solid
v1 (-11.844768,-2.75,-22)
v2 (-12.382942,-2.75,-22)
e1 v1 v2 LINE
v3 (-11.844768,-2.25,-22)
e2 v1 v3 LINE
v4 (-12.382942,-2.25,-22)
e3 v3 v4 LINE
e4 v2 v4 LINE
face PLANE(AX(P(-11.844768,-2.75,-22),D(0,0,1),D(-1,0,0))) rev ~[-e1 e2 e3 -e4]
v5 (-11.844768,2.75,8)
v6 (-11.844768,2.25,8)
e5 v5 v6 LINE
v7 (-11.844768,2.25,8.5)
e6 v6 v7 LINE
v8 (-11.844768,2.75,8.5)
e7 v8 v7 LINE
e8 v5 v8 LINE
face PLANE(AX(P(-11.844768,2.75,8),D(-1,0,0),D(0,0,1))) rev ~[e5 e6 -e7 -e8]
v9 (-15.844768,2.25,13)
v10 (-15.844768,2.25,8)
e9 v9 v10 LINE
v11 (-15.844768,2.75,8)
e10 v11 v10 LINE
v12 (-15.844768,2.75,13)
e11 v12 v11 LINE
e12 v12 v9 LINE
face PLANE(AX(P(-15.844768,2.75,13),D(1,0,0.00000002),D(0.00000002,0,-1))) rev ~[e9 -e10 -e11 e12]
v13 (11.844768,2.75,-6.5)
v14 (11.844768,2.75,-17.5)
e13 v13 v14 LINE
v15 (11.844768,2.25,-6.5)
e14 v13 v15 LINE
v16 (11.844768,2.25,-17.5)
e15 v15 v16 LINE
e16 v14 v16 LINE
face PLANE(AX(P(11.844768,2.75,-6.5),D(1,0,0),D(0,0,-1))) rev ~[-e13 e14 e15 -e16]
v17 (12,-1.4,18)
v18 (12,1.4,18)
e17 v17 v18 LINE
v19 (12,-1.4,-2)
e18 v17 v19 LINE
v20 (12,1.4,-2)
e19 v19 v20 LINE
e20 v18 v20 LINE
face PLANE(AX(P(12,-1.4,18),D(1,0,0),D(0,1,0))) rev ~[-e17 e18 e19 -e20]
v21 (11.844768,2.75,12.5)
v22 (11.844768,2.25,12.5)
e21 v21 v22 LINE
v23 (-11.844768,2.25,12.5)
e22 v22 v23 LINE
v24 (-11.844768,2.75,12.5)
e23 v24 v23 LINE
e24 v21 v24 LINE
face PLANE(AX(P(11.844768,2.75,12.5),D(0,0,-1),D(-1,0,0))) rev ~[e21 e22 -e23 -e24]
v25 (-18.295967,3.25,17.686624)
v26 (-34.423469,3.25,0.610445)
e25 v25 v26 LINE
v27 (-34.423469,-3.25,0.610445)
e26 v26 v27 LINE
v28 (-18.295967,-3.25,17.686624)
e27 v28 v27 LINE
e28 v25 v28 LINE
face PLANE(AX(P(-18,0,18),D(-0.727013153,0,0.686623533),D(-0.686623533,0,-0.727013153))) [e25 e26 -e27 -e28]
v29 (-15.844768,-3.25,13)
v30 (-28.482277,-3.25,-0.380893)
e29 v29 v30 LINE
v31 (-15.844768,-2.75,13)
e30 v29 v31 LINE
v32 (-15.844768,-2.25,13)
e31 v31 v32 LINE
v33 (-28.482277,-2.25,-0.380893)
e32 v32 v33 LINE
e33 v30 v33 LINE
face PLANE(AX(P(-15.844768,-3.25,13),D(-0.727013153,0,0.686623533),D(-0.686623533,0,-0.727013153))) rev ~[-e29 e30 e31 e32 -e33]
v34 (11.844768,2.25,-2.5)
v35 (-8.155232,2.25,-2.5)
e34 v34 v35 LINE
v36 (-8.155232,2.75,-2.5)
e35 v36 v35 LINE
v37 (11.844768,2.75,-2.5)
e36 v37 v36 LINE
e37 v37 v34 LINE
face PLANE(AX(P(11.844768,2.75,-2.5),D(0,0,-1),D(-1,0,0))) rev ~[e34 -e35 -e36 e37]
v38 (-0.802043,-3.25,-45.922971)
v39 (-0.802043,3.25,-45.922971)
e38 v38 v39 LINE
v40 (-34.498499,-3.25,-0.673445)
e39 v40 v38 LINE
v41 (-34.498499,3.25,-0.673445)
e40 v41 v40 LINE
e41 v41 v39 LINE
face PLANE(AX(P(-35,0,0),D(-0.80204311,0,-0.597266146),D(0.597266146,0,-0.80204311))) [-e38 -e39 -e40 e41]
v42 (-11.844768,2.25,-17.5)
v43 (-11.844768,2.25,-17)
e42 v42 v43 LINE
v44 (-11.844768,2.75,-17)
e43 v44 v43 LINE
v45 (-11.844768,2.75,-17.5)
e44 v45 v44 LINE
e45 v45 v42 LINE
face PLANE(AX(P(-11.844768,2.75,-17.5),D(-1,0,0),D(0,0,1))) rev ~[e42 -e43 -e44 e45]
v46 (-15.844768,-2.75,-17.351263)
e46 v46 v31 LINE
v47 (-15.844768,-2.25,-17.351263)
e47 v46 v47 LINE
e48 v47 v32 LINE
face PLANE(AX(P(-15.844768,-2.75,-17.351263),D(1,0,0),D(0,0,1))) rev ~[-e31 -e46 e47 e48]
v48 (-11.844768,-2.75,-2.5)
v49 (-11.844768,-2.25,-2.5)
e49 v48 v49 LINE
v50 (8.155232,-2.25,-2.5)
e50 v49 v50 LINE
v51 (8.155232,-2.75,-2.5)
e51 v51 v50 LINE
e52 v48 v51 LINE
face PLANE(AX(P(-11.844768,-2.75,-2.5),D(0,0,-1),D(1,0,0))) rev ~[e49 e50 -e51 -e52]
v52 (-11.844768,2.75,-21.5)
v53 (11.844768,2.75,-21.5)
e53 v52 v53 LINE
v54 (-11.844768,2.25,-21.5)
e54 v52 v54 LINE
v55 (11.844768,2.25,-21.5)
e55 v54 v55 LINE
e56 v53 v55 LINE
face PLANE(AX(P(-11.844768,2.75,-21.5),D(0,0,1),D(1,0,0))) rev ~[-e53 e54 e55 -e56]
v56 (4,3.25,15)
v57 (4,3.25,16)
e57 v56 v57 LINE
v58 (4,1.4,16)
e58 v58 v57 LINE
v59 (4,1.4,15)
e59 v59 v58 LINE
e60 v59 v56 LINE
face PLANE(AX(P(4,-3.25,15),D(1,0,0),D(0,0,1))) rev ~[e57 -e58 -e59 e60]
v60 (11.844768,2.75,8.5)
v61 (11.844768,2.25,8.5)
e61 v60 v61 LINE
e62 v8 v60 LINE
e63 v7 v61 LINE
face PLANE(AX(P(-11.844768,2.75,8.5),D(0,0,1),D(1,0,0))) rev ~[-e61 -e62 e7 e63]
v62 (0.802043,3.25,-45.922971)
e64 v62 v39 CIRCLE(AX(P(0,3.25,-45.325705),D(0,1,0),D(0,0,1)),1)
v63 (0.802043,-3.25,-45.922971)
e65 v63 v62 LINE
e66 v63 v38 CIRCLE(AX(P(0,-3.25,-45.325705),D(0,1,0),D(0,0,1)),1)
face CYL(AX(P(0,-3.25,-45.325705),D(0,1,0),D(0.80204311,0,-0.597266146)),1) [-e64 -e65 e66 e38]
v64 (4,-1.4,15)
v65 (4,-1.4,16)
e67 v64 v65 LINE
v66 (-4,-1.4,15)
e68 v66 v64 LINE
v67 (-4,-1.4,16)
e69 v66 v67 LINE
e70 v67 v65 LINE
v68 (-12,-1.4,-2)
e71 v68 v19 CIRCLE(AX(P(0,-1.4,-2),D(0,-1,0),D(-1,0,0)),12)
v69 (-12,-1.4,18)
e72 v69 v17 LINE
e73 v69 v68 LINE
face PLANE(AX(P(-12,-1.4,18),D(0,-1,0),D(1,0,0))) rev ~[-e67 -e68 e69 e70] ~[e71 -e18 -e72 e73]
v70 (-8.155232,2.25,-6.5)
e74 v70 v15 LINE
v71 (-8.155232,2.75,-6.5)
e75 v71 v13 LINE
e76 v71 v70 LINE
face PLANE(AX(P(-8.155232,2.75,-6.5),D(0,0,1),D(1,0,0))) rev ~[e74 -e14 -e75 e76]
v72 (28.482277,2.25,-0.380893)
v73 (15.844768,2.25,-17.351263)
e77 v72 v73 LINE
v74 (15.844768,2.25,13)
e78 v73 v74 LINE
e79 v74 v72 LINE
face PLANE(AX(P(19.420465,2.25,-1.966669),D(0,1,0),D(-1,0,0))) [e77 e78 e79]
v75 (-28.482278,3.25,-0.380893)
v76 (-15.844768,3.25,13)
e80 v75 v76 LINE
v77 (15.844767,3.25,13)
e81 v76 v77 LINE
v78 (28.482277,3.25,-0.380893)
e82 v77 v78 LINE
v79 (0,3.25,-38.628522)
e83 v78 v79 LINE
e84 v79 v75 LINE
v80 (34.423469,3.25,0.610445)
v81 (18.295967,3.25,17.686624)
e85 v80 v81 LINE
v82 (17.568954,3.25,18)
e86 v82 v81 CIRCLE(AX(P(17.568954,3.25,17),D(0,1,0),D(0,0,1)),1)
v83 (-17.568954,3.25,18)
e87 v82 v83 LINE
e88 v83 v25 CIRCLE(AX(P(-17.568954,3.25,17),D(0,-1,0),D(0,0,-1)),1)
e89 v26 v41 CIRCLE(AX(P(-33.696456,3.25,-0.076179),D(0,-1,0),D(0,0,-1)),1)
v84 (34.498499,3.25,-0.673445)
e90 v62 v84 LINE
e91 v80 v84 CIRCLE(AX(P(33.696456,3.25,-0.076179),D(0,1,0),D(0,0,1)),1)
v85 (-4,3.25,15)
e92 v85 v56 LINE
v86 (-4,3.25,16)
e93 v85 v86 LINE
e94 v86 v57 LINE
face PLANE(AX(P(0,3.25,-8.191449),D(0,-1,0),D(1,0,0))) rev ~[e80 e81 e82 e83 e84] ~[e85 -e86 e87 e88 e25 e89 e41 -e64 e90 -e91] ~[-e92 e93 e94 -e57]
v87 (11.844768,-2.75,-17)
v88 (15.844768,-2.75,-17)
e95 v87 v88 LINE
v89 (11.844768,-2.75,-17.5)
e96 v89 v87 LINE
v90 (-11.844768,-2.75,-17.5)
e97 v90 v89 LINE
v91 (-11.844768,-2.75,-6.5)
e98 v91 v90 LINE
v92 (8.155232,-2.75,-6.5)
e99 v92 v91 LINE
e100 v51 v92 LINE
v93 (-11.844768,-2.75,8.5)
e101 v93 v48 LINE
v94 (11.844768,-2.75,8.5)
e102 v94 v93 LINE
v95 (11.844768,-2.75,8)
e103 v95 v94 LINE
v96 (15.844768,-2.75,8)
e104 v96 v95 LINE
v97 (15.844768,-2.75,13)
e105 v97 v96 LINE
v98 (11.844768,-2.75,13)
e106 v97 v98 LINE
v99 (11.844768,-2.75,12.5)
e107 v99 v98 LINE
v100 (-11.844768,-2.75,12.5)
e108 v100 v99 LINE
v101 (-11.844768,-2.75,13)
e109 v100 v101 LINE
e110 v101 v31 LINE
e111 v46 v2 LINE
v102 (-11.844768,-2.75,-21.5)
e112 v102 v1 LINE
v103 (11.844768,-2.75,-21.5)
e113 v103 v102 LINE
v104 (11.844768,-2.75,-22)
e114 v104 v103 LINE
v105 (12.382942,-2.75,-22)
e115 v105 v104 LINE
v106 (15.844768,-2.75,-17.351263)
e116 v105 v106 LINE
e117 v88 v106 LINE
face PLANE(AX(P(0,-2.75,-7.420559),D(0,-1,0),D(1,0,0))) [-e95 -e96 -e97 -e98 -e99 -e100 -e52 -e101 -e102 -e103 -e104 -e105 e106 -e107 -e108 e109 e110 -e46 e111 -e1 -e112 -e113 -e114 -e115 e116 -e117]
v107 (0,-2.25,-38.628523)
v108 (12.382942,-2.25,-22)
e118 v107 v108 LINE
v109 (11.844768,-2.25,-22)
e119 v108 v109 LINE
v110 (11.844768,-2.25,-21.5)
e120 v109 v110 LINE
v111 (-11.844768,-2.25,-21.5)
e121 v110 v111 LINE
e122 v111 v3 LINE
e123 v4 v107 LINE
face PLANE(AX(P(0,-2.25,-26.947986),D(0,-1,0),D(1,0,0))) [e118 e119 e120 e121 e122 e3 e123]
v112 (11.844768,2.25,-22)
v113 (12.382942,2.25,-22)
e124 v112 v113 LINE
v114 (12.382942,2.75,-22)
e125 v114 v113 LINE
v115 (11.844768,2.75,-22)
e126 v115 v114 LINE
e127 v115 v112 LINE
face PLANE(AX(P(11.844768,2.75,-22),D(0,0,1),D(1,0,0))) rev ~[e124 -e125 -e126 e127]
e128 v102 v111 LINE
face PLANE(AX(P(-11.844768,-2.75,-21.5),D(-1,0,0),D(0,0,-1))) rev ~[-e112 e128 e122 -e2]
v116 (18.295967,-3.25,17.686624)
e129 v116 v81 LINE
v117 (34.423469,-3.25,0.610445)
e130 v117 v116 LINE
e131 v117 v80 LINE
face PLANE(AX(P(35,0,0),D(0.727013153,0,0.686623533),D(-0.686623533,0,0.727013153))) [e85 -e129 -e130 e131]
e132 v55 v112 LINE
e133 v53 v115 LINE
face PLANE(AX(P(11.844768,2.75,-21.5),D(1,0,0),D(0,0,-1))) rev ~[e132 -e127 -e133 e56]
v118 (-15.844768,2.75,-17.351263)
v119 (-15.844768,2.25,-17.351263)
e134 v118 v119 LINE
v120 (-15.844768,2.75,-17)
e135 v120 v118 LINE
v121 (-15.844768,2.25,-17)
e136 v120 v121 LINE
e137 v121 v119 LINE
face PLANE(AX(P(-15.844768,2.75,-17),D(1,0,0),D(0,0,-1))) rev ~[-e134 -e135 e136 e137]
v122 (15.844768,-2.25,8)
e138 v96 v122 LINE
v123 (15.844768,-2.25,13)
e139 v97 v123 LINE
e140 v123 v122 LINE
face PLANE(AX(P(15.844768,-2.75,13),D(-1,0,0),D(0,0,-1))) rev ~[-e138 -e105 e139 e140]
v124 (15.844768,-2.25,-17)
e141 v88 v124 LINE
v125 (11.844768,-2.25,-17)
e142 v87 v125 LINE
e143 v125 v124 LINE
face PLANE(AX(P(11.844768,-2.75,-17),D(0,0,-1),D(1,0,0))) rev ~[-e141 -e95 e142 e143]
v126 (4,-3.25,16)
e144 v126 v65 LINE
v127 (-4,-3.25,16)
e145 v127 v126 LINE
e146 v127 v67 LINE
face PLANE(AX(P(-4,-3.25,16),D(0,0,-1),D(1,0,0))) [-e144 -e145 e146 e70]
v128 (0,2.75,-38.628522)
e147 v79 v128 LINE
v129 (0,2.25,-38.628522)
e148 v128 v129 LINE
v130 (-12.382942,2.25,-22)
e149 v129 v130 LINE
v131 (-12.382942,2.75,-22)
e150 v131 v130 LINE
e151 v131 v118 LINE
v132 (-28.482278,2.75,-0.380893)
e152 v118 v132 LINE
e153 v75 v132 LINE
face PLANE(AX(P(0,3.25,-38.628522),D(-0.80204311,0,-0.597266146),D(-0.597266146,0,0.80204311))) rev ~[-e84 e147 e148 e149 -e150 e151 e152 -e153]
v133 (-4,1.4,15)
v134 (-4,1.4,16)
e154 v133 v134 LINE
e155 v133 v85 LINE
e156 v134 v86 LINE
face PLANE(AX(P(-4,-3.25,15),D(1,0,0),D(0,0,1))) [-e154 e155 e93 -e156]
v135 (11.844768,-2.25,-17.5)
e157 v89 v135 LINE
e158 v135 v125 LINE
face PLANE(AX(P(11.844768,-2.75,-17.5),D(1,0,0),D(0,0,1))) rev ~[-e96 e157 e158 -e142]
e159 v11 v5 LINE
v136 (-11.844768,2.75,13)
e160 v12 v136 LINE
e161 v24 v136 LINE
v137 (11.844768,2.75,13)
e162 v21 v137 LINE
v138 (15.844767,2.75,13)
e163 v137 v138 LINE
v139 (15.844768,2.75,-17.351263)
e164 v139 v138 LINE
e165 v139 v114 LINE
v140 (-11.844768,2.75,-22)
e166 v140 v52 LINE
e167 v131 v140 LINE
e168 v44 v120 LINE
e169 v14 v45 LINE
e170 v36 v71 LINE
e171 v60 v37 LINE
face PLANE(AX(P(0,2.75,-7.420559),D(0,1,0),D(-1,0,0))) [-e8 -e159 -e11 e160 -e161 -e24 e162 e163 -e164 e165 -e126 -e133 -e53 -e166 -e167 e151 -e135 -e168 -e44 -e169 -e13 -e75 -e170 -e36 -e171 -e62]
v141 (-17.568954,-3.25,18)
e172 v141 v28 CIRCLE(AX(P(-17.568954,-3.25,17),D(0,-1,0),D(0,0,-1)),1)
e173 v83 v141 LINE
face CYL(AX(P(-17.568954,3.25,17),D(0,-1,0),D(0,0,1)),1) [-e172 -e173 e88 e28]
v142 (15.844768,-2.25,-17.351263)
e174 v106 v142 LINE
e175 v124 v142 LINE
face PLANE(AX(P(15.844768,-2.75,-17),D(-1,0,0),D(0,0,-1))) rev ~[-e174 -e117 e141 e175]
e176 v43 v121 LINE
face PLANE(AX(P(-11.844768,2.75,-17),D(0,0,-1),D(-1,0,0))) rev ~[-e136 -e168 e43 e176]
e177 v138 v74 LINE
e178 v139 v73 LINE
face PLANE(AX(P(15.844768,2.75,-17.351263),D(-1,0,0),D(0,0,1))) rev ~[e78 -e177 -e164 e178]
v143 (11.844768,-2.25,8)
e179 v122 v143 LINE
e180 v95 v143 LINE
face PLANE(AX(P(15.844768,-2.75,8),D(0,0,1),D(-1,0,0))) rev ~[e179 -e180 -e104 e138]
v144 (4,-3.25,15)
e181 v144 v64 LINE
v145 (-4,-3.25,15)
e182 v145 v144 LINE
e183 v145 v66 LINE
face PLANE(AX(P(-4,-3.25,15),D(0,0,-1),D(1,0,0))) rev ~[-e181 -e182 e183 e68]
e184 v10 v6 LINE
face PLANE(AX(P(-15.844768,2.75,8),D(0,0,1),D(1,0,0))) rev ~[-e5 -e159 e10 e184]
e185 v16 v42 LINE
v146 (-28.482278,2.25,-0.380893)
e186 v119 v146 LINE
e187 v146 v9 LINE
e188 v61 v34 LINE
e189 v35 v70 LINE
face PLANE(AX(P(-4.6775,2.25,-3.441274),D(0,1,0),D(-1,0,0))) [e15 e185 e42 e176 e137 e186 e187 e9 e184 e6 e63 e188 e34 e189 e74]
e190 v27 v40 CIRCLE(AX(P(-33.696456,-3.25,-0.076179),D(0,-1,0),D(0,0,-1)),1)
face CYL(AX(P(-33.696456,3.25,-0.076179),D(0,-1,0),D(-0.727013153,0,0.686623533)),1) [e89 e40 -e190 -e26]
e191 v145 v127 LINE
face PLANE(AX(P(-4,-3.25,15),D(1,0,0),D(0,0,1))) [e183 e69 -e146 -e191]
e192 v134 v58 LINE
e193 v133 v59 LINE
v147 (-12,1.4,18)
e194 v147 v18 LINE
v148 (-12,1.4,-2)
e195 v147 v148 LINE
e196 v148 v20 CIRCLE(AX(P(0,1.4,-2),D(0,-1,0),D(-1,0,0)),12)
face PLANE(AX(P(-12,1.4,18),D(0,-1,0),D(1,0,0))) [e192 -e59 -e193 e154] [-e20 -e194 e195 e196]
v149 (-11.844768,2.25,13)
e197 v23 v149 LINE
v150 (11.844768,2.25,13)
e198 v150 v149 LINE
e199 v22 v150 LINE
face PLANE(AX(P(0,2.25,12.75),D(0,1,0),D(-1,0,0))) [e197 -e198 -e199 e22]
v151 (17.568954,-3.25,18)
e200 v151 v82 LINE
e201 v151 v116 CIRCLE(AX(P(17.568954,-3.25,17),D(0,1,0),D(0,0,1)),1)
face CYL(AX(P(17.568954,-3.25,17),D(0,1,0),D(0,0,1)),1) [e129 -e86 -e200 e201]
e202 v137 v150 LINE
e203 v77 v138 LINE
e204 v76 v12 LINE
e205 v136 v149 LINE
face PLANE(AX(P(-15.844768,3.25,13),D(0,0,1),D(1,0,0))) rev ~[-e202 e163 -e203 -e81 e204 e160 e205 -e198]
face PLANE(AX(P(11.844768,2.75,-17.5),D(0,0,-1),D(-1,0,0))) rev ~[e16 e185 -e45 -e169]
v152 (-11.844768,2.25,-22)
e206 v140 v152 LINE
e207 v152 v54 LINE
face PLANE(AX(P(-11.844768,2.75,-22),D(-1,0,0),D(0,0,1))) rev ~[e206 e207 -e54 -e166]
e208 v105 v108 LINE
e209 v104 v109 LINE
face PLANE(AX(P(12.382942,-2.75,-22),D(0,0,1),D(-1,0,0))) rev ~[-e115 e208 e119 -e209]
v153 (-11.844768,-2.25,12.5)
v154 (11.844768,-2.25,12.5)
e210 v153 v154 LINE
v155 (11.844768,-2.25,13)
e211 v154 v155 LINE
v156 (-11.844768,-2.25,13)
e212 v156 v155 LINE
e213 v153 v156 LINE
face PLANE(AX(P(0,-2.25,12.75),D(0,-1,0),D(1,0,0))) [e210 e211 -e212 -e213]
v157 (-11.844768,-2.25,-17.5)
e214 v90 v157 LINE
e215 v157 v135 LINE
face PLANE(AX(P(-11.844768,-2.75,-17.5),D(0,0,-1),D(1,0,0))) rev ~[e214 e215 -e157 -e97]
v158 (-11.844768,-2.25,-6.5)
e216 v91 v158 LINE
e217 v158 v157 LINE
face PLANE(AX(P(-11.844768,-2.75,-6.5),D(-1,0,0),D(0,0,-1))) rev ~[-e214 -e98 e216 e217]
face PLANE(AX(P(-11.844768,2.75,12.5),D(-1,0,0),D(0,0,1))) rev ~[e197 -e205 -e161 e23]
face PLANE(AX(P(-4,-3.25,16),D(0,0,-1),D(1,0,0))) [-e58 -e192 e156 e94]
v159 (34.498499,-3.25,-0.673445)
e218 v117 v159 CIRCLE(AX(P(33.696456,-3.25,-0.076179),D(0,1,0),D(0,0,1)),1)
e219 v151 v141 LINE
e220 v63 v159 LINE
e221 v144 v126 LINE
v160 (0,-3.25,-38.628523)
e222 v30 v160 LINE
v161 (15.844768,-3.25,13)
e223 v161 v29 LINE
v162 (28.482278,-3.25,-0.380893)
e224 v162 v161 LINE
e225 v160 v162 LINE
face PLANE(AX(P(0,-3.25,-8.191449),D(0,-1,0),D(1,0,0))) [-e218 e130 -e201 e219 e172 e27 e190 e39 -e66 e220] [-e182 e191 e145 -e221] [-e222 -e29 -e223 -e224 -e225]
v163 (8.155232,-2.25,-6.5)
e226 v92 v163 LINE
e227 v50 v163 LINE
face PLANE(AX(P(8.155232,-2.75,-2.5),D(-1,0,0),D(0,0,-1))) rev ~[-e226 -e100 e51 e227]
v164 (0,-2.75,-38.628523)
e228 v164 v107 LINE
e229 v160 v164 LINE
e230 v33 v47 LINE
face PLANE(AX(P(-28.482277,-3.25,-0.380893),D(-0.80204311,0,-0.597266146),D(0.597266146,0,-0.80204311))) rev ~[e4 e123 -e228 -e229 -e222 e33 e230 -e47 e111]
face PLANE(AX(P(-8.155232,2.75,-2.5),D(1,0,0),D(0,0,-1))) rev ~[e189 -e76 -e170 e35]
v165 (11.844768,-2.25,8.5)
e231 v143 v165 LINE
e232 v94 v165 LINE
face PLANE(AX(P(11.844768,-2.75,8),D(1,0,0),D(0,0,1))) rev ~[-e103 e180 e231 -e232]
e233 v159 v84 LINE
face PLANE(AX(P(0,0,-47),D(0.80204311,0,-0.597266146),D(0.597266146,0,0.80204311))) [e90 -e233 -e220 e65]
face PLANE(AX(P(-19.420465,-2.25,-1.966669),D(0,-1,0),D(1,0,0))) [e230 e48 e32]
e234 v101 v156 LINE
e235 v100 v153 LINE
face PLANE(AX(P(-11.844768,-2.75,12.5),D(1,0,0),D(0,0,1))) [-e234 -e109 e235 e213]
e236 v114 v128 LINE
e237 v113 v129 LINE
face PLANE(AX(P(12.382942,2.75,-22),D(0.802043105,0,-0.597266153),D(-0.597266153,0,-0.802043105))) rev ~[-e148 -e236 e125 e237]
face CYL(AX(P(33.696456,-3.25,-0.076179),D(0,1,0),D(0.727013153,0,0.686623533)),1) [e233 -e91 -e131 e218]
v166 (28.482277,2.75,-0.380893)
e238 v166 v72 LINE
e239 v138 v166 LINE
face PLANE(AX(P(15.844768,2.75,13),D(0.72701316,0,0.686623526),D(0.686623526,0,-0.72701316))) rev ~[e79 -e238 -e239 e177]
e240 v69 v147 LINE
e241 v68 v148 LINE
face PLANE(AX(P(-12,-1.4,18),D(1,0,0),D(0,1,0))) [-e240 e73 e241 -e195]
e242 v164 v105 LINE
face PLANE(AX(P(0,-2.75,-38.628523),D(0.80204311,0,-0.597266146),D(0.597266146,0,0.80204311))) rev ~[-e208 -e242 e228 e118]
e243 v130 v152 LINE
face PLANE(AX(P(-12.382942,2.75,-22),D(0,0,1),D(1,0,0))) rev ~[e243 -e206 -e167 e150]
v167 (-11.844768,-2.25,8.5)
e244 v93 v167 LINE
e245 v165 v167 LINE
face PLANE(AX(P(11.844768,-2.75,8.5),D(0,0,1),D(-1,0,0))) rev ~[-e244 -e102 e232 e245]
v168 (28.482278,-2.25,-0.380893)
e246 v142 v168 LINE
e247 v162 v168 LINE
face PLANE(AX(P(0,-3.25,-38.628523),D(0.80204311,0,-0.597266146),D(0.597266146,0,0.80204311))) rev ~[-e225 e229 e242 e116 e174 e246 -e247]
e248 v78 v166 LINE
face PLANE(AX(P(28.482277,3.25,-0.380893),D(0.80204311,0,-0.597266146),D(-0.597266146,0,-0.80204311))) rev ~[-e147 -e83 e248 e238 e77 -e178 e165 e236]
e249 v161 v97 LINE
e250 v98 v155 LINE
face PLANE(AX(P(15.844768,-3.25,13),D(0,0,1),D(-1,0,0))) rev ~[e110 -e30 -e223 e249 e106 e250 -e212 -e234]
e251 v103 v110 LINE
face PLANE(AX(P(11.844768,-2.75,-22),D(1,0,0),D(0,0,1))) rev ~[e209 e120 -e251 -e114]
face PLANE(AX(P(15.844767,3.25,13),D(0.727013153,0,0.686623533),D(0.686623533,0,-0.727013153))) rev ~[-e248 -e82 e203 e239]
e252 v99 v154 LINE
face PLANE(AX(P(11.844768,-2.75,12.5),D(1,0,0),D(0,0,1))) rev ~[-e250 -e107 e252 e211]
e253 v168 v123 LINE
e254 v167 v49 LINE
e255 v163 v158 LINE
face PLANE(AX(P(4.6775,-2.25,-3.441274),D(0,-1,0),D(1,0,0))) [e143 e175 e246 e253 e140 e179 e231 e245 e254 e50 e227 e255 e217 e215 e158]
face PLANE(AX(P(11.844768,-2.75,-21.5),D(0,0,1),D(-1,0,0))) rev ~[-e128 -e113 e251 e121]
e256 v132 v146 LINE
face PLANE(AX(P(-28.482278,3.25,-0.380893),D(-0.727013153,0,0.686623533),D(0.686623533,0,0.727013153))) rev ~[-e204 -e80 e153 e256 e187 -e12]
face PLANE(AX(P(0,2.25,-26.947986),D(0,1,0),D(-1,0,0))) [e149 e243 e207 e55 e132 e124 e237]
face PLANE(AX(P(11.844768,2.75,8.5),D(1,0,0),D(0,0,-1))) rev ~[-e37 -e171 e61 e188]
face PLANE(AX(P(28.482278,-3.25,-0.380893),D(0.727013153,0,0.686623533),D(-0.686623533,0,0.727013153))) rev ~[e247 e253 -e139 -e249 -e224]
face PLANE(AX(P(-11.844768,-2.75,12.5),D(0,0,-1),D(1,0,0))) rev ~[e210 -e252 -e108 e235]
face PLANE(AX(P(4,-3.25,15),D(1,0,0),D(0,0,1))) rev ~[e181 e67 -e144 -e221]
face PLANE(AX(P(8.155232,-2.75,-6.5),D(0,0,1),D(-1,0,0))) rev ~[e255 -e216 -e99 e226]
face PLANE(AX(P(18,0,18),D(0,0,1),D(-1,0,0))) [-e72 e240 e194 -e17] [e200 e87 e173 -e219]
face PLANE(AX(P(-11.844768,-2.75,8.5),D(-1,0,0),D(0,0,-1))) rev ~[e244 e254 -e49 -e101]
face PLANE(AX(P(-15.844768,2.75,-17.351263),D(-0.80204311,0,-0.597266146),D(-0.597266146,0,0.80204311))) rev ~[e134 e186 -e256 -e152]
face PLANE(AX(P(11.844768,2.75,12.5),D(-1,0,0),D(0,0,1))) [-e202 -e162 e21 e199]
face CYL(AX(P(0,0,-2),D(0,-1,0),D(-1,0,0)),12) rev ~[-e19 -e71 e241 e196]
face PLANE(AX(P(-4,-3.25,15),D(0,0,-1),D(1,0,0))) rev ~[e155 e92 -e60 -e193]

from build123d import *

# Parameters (mm, degrees)
F1_DEPTH  = 3.25
F3_DEPTH  = 0.5
F5_DEPTH  = 0.5
F6_W      = 23.6895351076
F6_H      = 0.5
F7_DEPTH  = 0.5
F8_W      = 23.6895351076
F8_H      = 0.5000002682
F9_DEPTH  = 0.5
F10_W     = 24
F10_H     = 2.8
F11_DEPTH = 20
F13_DEPTH = 1.4
F14_W     = 8
F14_H     = 1
F15_DEPTH = 25
F16_R     = 1


# Not quite as in the source:
# - ends of sketch curves that miss each other by under 0.0002 mm in the source are joined


with BuildPart() as f1:
    # F0 (on Front) → F1 (new body, symmetric)
    with BuildSketch(Plane.XZ):
        Polygon((18, 18), (0, 18), (-18, 18), (-35, 0), (0, -47), (35, 0), align=None)
    extrude(amount=F1_DEPTH, both=True)

    # F2 (on face) → F3 (cut)
    with BuildSketch(Plane.XZ.offset(3.25)):
        Polygon((15.8447675538, 13), (-15.8447675538, 13), (-28.4822773709, -0.3808927475), (1.162e-07, -38.628522516), (28.4822775009, -0.3808928851), align=None)
    extrude(amount=-F3_DEPTH, mode=Mode.SUBTRACT)

    # F4 (on face) → F5 (cut)
    with BuildSketch(Plane(origin=(0, 3.25, 0), x_dir=(-1, 0, 0), z_dir=(0, 1, 0))):
        Polygon((28.482277527, -0.3808925379), (15.8447676545, 13.0000002682), (-15.8447670441, 13.0000002682), (-28.4822772579, -0.3808928993), (0, -38.6285223599), align=None)
    extrude(amount=-F5_DEPTH, mode=Mode.SUBTRACT)

    # F6 (on face) → F7 (cut)
    with BuildSketch(Plane.XZ.offset(2.75)):
        Polygon((-15.8447675538, -17.3512630734), (-15.8447675538, 13), (-28.4822773709, -0.3808927475), align=None)
        Polygon((28.4822775009, -0.3808928851), (15.8447675538, 13), (15.8447675538, 8), (11.8447675538, 8), (11.8447675538, 8.5), (-11.8447675538, 8.5), (-11.8447675538, -2.5), (8.1552324462, -2.5), (8.1552324462, -6.5), (-11.8447675538, -6.5), (-11.8447675538, -17.5), (11.8447675538, -17.5), (11.8447675538, -17), (15.8447675538, -17), (15.8447675538, -17.3512633855), align=None)
        with Locations((0, 12.75)):
            Rectangle(F6_W, F6_H)
        Polygon((-11.8447675538, -22), (-12.3829421829, -22), (1.162e-07, -38.628522516), (12.3829424153, -22), (11.8447675538, -22), (11.8447675538, -21.5), (-11.8447675538, -21.5), align=None)
    extrude(amount=-F7_DEPTH, mode=Mode.SUBTRACT)

    # F8 (on face) → F9 (cut)
    with BuildSketch(Plane(origin=(0, 2.75, 0), x_dir=(-1, 0, 0), z_dir=(0, 1, 0))):
        Polygon((-11.8447675538, -2.5), (8.1552324462, -2.5), (8.1552324462, -6.5), (-11.8447675538, -6.5), (-11.8447675538, -17.5), (11.8447675538, -17.5), (11.8447675538, -17), (15.8447675538, -17), (15.8447675538, -17.3512630734), (28.482277527, -0.3808925379), (15.8447676545, 13.0000002682), (15.8447675538, 8), (11.8447675538, 8), (11.8447675538, 8.5), (-11.8447675538, 8.5), align=None)
        Polygon((11.8447675538, -21.5), (-11.8447675538, -21.5), (-11.8447675538, -22), (-12.3829424153, -22), (0, -38.6285223599), (12.3829421829, -22), (11.8447675538, -22), align=None)
        Polygon((-15.8447675538, -17.3512630734), (-15.8447675538, 13), (-28.4822772579, -0.3808928993), align=None)
        with Locations((0, 12.7500001341)):
            Rectangle(F8_W, F8_H)
    extrude(amount=-F9_DEPTH, mode=Mode.SUBTRACT)

    # F10 (on face) → F11 (cut)
    with BuildSketch(Plane.XY.offset(18)):
        Rectangle(F10_W, F10_H)
    extrude(amount=-F11_DEPTH, mode=Mode.SUBTRACT)

    # F12 (on Front) → F13 (cut, symmetric)
    with BuildSketch(Plane.XZ):
        with BuildLine():
            Line((12, -2), (-12, -2))
            ThreePointArc((-12, -2), (0, -14), (12, -2))
        make_face()
    extrude(amount=F13_DEPTH, both=True, mode=Mode.SUBTRACT)

    # F14 (on face) → F15 (cut)
    with BuildSketch(Plane.XZ.offset(3.25)):
        with Locations((0, 15.5)):
            Rectangle(F14_W, F14_H)
    extrude(amount=-F15_DEPTH, mode=Mode.SUBTRACT)

    # F16
    f16_edges = [f1.edges().sort_by_distance(p)[0] for p in [
        (0, 0, -47),
        (35, 0, 0),
        (-35, 0, 0),
        (-18, 0, 18),
        (18, 0, 18),
    ]]
    fillet(f16_edges, radius=F16_R)


solid = f1.part
